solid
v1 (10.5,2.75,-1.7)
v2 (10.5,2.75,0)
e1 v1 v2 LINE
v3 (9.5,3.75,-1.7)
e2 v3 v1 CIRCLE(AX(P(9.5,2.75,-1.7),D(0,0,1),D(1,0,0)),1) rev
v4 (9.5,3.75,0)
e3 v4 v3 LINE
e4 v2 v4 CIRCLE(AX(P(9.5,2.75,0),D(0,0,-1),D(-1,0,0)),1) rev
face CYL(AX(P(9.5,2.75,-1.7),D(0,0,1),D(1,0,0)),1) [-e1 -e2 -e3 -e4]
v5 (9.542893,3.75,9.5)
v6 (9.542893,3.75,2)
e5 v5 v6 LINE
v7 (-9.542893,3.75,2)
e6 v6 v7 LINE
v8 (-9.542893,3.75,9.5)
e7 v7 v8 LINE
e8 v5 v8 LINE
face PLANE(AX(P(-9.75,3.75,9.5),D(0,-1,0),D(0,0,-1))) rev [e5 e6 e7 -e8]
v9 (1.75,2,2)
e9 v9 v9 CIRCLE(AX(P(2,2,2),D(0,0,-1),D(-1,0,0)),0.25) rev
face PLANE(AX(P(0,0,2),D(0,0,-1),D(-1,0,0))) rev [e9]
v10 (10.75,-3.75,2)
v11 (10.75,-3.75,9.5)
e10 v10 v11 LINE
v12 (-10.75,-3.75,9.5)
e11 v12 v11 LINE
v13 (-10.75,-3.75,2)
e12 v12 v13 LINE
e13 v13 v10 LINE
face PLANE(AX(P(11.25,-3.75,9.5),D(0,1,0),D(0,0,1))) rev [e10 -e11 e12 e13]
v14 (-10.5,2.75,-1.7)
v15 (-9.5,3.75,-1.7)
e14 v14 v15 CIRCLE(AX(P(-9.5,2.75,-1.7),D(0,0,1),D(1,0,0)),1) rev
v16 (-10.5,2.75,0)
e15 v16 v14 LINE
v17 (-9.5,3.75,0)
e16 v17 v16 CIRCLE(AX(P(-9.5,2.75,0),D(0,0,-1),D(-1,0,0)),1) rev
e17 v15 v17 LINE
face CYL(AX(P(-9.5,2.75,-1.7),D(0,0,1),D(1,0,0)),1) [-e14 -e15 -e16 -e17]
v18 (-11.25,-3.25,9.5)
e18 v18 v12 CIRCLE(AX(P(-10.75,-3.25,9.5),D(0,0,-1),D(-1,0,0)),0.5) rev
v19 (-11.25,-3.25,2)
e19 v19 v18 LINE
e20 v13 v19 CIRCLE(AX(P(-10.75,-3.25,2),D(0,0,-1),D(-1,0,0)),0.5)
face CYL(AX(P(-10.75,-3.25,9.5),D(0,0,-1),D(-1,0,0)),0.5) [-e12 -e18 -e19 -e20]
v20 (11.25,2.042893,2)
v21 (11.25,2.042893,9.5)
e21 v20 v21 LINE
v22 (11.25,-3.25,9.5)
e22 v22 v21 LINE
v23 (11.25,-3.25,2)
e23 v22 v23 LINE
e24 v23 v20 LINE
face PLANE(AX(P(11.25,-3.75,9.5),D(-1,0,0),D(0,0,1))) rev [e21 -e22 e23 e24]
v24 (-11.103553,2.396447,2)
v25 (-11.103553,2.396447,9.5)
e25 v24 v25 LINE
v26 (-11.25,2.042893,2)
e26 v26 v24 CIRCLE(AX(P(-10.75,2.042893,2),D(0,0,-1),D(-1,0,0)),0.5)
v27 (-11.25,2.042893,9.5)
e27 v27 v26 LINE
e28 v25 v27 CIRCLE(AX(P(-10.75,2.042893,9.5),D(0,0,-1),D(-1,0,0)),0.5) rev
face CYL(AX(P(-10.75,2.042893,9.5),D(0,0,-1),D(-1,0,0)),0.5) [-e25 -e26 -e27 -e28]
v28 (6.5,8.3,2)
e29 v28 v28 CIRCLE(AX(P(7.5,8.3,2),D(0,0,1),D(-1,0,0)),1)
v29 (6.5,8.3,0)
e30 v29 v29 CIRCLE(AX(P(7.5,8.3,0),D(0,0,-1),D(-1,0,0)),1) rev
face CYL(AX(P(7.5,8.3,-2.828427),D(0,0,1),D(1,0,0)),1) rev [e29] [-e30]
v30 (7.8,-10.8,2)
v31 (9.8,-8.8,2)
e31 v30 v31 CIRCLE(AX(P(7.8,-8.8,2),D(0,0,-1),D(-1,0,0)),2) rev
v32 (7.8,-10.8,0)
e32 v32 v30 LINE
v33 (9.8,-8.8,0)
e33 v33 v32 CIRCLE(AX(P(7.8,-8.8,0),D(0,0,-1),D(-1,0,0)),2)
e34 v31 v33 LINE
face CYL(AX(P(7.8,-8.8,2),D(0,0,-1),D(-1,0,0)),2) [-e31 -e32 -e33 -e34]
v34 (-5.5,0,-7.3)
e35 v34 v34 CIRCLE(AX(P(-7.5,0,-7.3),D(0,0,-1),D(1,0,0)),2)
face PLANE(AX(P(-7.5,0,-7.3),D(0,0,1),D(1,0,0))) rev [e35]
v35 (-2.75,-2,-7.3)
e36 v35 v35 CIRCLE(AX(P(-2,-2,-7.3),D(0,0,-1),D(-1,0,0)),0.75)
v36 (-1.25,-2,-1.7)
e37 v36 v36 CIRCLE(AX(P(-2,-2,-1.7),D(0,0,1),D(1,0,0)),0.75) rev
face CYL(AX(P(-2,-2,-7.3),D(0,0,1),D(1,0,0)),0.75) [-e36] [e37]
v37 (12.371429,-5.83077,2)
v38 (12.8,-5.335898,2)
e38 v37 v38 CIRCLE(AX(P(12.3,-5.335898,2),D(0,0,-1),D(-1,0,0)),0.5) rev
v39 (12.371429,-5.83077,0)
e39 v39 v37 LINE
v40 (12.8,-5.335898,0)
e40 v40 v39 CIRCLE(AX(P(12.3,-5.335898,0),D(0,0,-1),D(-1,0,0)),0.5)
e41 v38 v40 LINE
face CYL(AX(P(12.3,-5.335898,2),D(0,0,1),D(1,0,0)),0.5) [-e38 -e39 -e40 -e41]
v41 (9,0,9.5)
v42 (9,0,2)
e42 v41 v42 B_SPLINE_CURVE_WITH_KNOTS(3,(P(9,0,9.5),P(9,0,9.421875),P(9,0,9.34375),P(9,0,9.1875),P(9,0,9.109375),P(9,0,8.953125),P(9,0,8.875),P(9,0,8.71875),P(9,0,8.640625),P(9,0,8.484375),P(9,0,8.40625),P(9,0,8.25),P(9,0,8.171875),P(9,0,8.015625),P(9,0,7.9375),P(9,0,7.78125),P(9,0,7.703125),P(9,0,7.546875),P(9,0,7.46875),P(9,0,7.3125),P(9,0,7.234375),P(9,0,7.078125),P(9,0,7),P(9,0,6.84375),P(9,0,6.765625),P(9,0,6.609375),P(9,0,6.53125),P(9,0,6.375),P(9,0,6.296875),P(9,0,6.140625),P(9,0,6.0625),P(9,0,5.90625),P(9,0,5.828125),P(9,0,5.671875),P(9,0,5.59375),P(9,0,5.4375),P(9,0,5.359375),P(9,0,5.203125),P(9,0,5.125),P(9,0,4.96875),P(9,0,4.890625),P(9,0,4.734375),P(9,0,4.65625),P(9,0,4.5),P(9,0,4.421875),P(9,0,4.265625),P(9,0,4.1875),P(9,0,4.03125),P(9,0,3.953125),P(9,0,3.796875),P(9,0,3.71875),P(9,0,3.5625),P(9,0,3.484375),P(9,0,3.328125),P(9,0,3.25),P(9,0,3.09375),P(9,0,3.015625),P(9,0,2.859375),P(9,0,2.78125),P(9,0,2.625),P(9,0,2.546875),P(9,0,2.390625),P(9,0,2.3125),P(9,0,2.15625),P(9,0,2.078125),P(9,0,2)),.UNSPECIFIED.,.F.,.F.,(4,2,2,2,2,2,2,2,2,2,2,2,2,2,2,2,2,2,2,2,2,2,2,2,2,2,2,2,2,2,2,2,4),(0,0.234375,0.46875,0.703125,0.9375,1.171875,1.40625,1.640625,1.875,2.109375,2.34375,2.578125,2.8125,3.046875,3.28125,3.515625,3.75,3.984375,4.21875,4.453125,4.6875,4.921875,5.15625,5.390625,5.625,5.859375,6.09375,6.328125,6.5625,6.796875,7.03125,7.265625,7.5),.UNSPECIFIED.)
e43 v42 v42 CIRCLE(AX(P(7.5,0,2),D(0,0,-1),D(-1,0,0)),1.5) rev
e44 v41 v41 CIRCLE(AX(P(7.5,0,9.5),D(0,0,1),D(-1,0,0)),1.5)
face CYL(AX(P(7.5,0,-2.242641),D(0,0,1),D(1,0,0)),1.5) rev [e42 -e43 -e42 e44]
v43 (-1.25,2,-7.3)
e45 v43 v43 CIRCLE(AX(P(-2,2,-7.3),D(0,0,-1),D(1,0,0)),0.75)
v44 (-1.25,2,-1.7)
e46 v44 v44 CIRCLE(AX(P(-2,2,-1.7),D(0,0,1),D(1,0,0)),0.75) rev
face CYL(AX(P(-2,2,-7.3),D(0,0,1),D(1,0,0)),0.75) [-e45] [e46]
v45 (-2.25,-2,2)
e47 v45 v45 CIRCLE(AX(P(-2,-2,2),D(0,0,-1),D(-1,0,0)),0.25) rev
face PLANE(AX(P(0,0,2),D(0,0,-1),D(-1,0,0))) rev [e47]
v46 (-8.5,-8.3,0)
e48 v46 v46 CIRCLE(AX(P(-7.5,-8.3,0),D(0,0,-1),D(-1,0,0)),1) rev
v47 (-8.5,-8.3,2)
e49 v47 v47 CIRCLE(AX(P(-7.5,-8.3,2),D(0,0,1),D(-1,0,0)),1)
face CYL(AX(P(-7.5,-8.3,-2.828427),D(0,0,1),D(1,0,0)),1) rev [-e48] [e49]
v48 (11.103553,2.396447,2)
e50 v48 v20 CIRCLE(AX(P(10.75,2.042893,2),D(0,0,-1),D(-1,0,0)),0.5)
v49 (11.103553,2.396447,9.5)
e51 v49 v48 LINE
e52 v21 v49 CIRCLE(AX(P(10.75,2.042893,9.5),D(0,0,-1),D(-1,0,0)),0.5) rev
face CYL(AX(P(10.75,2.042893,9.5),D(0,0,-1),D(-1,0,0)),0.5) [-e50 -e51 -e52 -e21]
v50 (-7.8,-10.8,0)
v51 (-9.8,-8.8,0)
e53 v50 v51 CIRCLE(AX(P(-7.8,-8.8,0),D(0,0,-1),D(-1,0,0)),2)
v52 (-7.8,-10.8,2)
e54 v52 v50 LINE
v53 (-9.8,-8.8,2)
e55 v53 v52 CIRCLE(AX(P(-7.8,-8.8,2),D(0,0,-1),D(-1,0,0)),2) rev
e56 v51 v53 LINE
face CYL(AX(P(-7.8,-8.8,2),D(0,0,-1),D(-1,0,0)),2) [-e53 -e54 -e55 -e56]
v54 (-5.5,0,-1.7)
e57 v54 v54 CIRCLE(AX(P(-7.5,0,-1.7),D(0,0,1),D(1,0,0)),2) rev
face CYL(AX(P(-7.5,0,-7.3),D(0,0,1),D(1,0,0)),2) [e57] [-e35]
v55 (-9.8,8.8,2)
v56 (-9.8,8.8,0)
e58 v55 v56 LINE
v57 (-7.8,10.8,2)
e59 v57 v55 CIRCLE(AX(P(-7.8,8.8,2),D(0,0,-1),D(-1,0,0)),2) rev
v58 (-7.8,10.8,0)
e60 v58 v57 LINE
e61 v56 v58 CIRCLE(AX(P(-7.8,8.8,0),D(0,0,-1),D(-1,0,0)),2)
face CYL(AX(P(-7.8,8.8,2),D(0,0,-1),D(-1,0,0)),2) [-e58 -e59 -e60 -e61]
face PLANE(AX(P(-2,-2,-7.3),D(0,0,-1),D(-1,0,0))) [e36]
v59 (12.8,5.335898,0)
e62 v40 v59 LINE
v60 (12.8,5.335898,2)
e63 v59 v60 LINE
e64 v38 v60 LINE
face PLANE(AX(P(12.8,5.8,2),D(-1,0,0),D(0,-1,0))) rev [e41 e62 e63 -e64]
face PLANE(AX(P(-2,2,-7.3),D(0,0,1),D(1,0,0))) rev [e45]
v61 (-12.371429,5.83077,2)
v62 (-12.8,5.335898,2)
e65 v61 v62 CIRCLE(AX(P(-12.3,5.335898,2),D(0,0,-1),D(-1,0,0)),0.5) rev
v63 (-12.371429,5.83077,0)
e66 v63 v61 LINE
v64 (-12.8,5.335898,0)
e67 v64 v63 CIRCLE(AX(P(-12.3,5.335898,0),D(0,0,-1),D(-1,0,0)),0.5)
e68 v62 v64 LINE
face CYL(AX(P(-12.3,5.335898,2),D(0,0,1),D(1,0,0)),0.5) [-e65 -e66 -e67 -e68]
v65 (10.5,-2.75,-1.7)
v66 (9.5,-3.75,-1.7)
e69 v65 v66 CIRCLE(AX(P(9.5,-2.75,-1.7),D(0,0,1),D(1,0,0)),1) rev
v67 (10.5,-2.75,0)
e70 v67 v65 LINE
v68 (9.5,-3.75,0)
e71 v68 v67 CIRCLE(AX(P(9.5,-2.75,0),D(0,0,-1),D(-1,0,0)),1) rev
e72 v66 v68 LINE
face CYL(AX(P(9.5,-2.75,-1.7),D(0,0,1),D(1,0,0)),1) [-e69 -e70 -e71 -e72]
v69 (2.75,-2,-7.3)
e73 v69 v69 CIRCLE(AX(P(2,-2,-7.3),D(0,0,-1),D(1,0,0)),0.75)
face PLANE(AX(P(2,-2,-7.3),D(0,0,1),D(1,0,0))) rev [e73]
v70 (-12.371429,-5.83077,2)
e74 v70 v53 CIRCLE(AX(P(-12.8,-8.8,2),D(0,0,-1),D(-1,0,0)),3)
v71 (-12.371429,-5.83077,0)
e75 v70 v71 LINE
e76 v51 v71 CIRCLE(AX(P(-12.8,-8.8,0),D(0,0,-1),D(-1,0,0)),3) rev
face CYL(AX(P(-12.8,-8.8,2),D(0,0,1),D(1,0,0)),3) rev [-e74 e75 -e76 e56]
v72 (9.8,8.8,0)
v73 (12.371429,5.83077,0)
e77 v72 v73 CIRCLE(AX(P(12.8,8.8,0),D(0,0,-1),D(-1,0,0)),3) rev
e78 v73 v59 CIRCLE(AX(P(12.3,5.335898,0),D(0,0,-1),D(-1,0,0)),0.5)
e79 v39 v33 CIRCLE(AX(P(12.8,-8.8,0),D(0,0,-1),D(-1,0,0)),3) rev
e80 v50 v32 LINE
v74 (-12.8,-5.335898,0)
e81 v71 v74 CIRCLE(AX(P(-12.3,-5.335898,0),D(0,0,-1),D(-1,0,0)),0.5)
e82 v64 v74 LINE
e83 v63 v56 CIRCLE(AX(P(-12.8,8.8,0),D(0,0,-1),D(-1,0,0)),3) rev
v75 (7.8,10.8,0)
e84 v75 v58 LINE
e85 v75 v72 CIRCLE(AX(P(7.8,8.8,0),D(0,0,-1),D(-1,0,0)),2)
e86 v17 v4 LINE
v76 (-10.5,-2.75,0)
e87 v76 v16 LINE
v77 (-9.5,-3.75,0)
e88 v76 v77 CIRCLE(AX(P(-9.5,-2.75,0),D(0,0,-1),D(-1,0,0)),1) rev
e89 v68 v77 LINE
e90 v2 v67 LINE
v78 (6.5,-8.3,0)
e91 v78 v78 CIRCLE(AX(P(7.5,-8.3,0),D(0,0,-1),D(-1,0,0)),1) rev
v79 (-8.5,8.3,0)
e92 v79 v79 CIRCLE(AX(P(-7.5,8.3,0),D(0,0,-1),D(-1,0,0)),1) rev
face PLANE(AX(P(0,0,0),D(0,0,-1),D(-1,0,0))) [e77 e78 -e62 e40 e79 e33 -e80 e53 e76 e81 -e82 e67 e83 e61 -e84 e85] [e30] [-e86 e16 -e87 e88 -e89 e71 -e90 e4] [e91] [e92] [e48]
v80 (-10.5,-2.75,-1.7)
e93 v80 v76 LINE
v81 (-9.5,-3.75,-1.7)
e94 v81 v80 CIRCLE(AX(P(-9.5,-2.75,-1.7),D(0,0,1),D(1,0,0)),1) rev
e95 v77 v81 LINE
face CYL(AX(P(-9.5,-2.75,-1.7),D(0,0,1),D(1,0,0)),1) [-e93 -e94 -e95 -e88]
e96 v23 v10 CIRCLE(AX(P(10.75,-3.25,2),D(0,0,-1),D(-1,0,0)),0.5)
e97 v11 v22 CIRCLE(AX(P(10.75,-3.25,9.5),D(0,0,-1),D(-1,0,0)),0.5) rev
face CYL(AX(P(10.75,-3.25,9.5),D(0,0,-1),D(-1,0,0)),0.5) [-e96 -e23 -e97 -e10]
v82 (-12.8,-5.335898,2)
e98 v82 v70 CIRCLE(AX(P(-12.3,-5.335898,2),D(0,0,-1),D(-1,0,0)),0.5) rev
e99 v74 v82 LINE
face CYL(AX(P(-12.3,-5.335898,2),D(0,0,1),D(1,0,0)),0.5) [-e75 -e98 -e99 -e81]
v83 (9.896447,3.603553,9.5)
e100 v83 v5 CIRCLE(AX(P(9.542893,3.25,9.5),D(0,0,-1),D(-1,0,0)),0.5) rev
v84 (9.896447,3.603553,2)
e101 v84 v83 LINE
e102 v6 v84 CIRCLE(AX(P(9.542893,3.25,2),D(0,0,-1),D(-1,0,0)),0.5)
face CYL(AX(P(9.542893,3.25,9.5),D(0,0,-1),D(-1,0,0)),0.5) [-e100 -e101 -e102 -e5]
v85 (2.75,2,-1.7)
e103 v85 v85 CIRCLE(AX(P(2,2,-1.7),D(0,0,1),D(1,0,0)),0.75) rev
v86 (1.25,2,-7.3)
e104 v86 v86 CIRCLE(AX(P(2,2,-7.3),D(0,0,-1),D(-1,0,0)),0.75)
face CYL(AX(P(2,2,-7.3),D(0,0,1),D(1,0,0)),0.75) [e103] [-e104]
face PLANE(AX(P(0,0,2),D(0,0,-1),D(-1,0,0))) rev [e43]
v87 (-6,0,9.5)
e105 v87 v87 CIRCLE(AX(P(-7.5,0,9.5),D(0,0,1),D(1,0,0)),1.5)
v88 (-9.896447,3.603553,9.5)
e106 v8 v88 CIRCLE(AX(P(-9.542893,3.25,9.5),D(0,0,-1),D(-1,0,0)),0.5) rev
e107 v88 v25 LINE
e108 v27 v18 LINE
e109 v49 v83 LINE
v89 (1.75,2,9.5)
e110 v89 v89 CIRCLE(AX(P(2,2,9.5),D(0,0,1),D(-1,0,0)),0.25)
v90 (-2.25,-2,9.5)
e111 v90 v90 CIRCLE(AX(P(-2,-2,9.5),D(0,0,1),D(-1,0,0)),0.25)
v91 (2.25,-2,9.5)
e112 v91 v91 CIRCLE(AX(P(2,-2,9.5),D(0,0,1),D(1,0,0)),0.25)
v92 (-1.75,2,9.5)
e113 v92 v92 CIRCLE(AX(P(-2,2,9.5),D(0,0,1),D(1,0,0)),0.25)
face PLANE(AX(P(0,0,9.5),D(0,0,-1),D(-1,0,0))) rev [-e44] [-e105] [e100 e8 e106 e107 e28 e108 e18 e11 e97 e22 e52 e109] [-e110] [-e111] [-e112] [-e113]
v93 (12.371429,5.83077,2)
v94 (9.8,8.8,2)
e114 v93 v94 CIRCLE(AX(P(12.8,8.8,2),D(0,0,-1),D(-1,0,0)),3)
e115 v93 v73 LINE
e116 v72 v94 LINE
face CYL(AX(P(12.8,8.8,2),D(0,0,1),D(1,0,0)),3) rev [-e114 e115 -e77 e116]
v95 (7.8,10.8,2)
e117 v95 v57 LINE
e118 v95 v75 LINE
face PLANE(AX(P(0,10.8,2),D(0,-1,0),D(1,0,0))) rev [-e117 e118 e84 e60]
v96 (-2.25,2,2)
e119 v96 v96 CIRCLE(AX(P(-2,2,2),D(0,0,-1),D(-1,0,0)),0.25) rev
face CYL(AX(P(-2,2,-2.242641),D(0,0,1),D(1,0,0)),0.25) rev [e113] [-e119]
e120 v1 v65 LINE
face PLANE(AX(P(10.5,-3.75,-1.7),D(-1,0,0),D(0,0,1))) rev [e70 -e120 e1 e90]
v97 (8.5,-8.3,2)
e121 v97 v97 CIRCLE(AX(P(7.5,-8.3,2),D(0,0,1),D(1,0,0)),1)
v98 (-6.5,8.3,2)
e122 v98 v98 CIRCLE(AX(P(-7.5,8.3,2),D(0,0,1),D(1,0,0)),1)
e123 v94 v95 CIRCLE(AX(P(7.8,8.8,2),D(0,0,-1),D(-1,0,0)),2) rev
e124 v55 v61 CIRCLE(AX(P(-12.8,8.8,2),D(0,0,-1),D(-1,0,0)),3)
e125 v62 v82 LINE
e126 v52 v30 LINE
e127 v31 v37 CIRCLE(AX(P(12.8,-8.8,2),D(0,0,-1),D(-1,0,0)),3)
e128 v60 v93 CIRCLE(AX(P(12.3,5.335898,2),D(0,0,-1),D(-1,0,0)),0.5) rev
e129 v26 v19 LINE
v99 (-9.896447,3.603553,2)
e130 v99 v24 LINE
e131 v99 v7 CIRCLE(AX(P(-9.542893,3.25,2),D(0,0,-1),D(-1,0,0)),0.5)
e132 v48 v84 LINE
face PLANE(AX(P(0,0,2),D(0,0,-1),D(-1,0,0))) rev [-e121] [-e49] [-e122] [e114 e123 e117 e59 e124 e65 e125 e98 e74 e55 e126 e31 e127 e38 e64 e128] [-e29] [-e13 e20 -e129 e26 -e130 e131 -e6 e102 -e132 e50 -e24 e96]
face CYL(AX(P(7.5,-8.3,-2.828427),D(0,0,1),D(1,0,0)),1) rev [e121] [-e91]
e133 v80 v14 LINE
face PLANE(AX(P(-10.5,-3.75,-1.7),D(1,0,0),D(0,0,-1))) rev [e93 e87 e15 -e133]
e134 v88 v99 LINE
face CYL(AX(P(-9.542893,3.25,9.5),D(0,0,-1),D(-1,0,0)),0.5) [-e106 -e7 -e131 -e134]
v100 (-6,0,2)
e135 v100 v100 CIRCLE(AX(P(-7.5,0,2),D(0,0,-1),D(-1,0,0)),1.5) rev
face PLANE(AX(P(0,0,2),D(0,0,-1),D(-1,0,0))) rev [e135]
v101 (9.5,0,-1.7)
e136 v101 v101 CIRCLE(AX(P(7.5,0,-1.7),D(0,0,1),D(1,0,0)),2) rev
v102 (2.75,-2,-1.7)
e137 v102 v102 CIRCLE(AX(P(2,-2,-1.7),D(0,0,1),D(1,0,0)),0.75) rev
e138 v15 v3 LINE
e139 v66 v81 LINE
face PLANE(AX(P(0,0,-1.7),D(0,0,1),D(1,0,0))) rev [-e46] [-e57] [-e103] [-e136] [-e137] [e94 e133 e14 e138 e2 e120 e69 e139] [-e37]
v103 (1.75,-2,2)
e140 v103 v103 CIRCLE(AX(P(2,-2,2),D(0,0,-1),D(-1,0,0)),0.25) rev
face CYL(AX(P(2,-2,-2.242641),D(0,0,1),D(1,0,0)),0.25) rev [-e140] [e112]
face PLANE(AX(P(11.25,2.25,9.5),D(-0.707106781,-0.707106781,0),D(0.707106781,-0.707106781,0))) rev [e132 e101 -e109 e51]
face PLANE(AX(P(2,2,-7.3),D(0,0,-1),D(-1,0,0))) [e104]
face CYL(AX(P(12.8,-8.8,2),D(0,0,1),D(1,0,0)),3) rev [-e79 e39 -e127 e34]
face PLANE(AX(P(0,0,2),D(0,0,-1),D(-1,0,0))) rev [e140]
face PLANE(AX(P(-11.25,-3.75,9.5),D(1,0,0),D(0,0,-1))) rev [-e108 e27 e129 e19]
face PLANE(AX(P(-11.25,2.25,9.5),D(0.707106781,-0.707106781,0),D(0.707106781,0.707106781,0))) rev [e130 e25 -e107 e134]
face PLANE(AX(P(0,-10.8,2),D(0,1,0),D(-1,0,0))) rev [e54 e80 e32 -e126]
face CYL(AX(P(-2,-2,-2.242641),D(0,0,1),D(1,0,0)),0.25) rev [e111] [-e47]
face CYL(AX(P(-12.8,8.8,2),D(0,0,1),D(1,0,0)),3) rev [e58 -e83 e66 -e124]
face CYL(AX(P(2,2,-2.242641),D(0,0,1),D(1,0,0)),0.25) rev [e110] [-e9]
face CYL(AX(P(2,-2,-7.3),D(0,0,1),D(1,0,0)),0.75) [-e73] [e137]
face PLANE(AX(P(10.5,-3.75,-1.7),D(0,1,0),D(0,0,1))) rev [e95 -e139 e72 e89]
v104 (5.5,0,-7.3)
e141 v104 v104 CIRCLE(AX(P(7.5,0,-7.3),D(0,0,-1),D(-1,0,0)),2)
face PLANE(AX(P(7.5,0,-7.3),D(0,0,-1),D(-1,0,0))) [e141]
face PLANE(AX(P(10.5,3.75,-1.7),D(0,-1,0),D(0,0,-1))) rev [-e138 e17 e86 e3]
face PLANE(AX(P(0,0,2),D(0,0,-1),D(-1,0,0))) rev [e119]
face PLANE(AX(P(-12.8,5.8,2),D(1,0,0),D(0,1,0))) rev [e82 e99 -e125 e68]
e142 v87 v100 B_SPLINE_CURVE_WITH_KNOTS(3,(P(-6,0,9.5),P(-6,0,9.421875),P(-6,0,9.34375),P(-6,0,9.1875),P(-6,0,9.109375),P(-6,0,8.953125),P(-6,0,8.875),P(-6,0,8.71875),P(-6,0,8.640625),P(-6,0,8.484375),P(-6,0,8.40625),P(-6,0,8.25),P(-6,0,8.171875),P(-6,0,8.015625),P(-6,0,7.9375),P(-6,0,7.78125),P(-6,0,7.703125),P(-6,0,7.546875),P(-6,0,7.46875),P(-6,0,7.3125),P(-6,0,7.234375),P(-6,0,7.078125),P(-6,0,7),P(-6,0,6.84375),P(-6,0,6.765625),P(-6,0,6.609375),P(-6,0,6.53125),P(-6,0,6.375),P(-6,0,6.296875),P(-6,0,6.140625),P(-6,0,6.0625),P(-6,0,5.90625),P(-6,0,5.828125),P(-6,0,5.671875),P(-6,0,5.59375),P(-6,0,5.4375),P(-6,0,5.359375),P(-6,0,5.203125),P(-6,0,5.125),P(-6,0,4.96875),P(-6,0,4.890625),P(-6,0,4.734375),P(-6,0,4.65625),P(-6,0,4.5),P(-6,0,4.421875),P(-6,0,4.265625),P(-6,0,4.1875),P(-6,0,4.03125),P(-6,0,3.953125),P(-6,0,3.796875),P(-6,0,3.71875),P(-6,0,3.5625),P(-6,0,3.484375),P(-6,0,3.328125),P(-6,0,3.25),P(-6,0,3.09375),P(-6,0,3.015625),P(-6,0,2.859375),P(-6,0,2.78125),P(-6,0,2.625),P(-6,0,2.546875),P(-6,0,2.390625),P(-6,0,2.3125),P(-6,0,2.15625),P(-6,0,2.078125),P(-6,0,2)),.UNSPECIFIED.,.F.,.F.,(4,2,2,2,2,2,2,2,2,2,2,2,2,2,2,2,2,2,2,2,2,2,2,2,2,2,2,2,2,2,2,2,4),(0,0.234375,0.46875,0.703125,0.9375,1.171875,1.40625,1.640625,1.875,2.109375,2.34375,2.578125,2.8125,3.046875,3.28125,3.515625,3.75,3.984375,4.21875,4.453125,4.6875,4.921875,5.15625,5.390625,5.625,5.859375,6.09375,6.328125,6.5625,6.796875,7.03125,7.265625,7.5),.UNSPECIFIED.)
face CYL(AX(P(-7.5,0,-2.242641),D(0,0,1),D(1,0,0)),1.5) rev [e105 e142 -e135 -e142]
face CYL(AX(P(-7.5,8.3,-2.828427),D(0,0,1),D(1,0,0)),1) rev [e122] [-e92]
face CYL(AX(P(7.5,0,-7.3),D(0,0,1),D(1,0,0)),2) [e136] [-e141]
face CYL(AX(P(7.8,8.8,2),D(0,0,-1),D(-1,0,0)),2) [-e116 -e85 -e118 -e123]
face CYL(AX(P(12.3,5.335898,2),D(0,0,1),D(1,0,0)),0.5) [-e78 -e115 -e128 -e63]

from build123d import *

# Parameters (mm, degrees)
EXTRUDE_1_DEPTH     = 2
SKETCH_2_R          = 1
CUT_EXTRUDE_1_DEPTH = 2
EXTRUDE_2_DEPTH     = 7.5
SKETCH_4_R          = 1.5
SKETCH_4_R_2        = 0.25
CUT_EXTRUDE_2_DEPTH = 7.5
SKETCH_5_W          = 21
SKETCH_5_H          = 7.5
EXTRUDE_3_DEPTH     = 1.7
SKETCH_6_R          = 2
SKETCH_6_R_2        = 0.75
EXTRUDE_4_DEPTH     = 5.6
FILLET_1_R          = 2
FILLET_2_R          = 3
FILLET_3_R          = 1
FILLET_4_R          = 0.5


with BuildPart() as part:
    # 草图1 → 凸台-拉伸1 (new body)
    with BuildSketch(Plane.XY):
        Polygon((0, 10.8), (-9.8, 10.8), (-9.8, 5.8), (-12.8, 5.8), (-12.8, -5.8), (-9.8, -5.8), (-9.8, -10.8), (0, -10.8), (9.8, -10.8), (9.8, -5.8), (12.8, -5.8), (12.8, 5.8), (9.8, 5.8), (9.8, 10.8), align=None)
    extrude(amount=EXTRUDE_1_DEPTH)

    # 草图2 → 切除-拉伸1 (cut)
    with BuildSketch(Plane.XY.offset(2)):
        with Locations((-7.5, 8.3)):
            Circle(SKETCH_2_R)
        with Locations(Location((7.5, 8.3, 0), (0, 0, 180))):
            Circle(SKETCH_2_R)
        with Locations((7.5, -8.3)):
            Circle(SKETCH_2_R)
        with Locations(Location((-7.5, -8.3, 0), (0, 0, 180))):
            Circle(SKETCH_2_R)
    extrude(amount=-CUT_EXTRUDE_1_DEPTH, mode=Mode.SUBTRACT)

    # 草图3 → 凸台-拉伸2 (add)
    with BuildSketch(Plane.XY.offset(2)):
        Polygon((11.25, -3.75), (-11.25, -3.75), (-11.25, 2.25), (-9.75, 3.75), (9.75, 3.75), (11.25, 2.25), align=None)
    extrude(amount=EXTRUDE_2_DEPTH)

    # 草图4 → 切除-拉伸2 (cut)
    with BuildSketch(Plane.XY.offset(9.5)):
        with Locations((-7.5, 0)):
            Circle(SKETCH_4_R)
        with Locations((-2, 2)):
            Circle(SKETCH_4_R_2)
        with Locations(Location((2, 2, 0), (0, 0, 180))):
            Circle(SKETCH_4_R_2)
        with Locations((7.5, 0)):
            Circle(SKETCH_4_R)
        with Locations((2, -2)):
            Circle(SKETCH_4_R_2)
        with Locations(Location((-2, -2, 0), (0, 0, 180))):
            Circle(SKETCH_4_R_2)
    extrude(amount=-CUT_EXTRUDE_2_DEPTH, mode=Mode.SUBTRACT)

    # 草图5 → 凸台-拉伸3 (add)
    with BuildSketch(Plane(origin=(0, 0, 0), x_dir=(-1, 0, 0), z_dir=(0, 0, -1))):
        Rectangle(SKETCH_5_W, SKETCH_5_H)
    extrude(amount=EXTRUDE_3_DEPTH)

    # 草图6 → 凸台-拉伸4 (add)
    with BuildSketch(Plane(origin=(0, 0, -1.7), x_dir=(-1, 0, 0), z_dir=(0, 0, -1))):
        with Locations(Location((-7.5, 0, 0), (0, 0, 180))):
            Circle(SKETCH_6_R)
        with Locations(Location((-2, 2, 0), (0, 0, 180))):
            Circle(SKETCH_6_R_2)
        with Locations(Location((2, 2, 0), (0, 0, 180))):
            Circle(SKETCH_6_R_2)
        with Locations(Location((7.5, 0, 0), (0, 0, 180))):
            Circle(SKETCH_6_R)
        with Locations(Location((2, -2, 0), (0, 0, 180))):
            Circle(SKETCH_6_R_2)
        with Locations(Location((-2, -2, 0), (0, 0, 180))):
            Circle(SKETCH_6_R_2)
    extrude(amount=EXTRUDE_4_DEPTH)

    # 圆角1
    fillet_1_edges = [part.edges().sort_by_distance(p)[0] for p in [
        (9.8, 10.8, 1),
        (9.8, -10.8, 1),
        (-9.8, -10.8, 1),
        (-9.8, 10.8, 1),
    ]]
    fillet(fillet_1_edges, radius=FILLET_1_R)

    # 圆角2
    fillet_2_edges = [part.edges().sort_by_distance(p)[0] for p in [
        (-9.8, -5.8, 1),
        (9.8, -5.8, 1),
        (-9.8, 5.8, 1),
        (9.8, 5.8, 1),
    ]]
    fillet(fillet_2_edges, radius=FILLET_2_R - 0.0001)  # a hair under: the kernel refuses the full size

    # 圆角3
    fillet_3_edges = [part.edges().sort_by_distance(p)[0] for p in [
        (-10.5, -3.75, -0.85),
        (-10.5, 3.75, -0.85),
        (10.5, 3.75, -0.85),
        (10.5, -3.75, -0.85),
    ]]
    fillet(fillet_3_edges, radius=FILLET_3_R)

    # 圆角4
    fillet_4_edges = [part.edges().sort_by_distance(p)[0] for p in [
        (12.8, 5.8, 1),
        (12.8, -5.8, 1),
        (-12.8, -5.8, 1),
        (-12.8, 5.8, 1),
        (11.25, 2.25, 5.75),
        (9.75, 3.75, 5.75),
        (-9.75, 3.75, 5.75),
        (-11.25, 2.25, 5.75),
        (-11.25, -3.75, 5.75),
        (11.25, -3.75, 5.75),
    ]]
    fillet(fillet_4_edges, radius=FILLET_4_R)


solid = part.part
